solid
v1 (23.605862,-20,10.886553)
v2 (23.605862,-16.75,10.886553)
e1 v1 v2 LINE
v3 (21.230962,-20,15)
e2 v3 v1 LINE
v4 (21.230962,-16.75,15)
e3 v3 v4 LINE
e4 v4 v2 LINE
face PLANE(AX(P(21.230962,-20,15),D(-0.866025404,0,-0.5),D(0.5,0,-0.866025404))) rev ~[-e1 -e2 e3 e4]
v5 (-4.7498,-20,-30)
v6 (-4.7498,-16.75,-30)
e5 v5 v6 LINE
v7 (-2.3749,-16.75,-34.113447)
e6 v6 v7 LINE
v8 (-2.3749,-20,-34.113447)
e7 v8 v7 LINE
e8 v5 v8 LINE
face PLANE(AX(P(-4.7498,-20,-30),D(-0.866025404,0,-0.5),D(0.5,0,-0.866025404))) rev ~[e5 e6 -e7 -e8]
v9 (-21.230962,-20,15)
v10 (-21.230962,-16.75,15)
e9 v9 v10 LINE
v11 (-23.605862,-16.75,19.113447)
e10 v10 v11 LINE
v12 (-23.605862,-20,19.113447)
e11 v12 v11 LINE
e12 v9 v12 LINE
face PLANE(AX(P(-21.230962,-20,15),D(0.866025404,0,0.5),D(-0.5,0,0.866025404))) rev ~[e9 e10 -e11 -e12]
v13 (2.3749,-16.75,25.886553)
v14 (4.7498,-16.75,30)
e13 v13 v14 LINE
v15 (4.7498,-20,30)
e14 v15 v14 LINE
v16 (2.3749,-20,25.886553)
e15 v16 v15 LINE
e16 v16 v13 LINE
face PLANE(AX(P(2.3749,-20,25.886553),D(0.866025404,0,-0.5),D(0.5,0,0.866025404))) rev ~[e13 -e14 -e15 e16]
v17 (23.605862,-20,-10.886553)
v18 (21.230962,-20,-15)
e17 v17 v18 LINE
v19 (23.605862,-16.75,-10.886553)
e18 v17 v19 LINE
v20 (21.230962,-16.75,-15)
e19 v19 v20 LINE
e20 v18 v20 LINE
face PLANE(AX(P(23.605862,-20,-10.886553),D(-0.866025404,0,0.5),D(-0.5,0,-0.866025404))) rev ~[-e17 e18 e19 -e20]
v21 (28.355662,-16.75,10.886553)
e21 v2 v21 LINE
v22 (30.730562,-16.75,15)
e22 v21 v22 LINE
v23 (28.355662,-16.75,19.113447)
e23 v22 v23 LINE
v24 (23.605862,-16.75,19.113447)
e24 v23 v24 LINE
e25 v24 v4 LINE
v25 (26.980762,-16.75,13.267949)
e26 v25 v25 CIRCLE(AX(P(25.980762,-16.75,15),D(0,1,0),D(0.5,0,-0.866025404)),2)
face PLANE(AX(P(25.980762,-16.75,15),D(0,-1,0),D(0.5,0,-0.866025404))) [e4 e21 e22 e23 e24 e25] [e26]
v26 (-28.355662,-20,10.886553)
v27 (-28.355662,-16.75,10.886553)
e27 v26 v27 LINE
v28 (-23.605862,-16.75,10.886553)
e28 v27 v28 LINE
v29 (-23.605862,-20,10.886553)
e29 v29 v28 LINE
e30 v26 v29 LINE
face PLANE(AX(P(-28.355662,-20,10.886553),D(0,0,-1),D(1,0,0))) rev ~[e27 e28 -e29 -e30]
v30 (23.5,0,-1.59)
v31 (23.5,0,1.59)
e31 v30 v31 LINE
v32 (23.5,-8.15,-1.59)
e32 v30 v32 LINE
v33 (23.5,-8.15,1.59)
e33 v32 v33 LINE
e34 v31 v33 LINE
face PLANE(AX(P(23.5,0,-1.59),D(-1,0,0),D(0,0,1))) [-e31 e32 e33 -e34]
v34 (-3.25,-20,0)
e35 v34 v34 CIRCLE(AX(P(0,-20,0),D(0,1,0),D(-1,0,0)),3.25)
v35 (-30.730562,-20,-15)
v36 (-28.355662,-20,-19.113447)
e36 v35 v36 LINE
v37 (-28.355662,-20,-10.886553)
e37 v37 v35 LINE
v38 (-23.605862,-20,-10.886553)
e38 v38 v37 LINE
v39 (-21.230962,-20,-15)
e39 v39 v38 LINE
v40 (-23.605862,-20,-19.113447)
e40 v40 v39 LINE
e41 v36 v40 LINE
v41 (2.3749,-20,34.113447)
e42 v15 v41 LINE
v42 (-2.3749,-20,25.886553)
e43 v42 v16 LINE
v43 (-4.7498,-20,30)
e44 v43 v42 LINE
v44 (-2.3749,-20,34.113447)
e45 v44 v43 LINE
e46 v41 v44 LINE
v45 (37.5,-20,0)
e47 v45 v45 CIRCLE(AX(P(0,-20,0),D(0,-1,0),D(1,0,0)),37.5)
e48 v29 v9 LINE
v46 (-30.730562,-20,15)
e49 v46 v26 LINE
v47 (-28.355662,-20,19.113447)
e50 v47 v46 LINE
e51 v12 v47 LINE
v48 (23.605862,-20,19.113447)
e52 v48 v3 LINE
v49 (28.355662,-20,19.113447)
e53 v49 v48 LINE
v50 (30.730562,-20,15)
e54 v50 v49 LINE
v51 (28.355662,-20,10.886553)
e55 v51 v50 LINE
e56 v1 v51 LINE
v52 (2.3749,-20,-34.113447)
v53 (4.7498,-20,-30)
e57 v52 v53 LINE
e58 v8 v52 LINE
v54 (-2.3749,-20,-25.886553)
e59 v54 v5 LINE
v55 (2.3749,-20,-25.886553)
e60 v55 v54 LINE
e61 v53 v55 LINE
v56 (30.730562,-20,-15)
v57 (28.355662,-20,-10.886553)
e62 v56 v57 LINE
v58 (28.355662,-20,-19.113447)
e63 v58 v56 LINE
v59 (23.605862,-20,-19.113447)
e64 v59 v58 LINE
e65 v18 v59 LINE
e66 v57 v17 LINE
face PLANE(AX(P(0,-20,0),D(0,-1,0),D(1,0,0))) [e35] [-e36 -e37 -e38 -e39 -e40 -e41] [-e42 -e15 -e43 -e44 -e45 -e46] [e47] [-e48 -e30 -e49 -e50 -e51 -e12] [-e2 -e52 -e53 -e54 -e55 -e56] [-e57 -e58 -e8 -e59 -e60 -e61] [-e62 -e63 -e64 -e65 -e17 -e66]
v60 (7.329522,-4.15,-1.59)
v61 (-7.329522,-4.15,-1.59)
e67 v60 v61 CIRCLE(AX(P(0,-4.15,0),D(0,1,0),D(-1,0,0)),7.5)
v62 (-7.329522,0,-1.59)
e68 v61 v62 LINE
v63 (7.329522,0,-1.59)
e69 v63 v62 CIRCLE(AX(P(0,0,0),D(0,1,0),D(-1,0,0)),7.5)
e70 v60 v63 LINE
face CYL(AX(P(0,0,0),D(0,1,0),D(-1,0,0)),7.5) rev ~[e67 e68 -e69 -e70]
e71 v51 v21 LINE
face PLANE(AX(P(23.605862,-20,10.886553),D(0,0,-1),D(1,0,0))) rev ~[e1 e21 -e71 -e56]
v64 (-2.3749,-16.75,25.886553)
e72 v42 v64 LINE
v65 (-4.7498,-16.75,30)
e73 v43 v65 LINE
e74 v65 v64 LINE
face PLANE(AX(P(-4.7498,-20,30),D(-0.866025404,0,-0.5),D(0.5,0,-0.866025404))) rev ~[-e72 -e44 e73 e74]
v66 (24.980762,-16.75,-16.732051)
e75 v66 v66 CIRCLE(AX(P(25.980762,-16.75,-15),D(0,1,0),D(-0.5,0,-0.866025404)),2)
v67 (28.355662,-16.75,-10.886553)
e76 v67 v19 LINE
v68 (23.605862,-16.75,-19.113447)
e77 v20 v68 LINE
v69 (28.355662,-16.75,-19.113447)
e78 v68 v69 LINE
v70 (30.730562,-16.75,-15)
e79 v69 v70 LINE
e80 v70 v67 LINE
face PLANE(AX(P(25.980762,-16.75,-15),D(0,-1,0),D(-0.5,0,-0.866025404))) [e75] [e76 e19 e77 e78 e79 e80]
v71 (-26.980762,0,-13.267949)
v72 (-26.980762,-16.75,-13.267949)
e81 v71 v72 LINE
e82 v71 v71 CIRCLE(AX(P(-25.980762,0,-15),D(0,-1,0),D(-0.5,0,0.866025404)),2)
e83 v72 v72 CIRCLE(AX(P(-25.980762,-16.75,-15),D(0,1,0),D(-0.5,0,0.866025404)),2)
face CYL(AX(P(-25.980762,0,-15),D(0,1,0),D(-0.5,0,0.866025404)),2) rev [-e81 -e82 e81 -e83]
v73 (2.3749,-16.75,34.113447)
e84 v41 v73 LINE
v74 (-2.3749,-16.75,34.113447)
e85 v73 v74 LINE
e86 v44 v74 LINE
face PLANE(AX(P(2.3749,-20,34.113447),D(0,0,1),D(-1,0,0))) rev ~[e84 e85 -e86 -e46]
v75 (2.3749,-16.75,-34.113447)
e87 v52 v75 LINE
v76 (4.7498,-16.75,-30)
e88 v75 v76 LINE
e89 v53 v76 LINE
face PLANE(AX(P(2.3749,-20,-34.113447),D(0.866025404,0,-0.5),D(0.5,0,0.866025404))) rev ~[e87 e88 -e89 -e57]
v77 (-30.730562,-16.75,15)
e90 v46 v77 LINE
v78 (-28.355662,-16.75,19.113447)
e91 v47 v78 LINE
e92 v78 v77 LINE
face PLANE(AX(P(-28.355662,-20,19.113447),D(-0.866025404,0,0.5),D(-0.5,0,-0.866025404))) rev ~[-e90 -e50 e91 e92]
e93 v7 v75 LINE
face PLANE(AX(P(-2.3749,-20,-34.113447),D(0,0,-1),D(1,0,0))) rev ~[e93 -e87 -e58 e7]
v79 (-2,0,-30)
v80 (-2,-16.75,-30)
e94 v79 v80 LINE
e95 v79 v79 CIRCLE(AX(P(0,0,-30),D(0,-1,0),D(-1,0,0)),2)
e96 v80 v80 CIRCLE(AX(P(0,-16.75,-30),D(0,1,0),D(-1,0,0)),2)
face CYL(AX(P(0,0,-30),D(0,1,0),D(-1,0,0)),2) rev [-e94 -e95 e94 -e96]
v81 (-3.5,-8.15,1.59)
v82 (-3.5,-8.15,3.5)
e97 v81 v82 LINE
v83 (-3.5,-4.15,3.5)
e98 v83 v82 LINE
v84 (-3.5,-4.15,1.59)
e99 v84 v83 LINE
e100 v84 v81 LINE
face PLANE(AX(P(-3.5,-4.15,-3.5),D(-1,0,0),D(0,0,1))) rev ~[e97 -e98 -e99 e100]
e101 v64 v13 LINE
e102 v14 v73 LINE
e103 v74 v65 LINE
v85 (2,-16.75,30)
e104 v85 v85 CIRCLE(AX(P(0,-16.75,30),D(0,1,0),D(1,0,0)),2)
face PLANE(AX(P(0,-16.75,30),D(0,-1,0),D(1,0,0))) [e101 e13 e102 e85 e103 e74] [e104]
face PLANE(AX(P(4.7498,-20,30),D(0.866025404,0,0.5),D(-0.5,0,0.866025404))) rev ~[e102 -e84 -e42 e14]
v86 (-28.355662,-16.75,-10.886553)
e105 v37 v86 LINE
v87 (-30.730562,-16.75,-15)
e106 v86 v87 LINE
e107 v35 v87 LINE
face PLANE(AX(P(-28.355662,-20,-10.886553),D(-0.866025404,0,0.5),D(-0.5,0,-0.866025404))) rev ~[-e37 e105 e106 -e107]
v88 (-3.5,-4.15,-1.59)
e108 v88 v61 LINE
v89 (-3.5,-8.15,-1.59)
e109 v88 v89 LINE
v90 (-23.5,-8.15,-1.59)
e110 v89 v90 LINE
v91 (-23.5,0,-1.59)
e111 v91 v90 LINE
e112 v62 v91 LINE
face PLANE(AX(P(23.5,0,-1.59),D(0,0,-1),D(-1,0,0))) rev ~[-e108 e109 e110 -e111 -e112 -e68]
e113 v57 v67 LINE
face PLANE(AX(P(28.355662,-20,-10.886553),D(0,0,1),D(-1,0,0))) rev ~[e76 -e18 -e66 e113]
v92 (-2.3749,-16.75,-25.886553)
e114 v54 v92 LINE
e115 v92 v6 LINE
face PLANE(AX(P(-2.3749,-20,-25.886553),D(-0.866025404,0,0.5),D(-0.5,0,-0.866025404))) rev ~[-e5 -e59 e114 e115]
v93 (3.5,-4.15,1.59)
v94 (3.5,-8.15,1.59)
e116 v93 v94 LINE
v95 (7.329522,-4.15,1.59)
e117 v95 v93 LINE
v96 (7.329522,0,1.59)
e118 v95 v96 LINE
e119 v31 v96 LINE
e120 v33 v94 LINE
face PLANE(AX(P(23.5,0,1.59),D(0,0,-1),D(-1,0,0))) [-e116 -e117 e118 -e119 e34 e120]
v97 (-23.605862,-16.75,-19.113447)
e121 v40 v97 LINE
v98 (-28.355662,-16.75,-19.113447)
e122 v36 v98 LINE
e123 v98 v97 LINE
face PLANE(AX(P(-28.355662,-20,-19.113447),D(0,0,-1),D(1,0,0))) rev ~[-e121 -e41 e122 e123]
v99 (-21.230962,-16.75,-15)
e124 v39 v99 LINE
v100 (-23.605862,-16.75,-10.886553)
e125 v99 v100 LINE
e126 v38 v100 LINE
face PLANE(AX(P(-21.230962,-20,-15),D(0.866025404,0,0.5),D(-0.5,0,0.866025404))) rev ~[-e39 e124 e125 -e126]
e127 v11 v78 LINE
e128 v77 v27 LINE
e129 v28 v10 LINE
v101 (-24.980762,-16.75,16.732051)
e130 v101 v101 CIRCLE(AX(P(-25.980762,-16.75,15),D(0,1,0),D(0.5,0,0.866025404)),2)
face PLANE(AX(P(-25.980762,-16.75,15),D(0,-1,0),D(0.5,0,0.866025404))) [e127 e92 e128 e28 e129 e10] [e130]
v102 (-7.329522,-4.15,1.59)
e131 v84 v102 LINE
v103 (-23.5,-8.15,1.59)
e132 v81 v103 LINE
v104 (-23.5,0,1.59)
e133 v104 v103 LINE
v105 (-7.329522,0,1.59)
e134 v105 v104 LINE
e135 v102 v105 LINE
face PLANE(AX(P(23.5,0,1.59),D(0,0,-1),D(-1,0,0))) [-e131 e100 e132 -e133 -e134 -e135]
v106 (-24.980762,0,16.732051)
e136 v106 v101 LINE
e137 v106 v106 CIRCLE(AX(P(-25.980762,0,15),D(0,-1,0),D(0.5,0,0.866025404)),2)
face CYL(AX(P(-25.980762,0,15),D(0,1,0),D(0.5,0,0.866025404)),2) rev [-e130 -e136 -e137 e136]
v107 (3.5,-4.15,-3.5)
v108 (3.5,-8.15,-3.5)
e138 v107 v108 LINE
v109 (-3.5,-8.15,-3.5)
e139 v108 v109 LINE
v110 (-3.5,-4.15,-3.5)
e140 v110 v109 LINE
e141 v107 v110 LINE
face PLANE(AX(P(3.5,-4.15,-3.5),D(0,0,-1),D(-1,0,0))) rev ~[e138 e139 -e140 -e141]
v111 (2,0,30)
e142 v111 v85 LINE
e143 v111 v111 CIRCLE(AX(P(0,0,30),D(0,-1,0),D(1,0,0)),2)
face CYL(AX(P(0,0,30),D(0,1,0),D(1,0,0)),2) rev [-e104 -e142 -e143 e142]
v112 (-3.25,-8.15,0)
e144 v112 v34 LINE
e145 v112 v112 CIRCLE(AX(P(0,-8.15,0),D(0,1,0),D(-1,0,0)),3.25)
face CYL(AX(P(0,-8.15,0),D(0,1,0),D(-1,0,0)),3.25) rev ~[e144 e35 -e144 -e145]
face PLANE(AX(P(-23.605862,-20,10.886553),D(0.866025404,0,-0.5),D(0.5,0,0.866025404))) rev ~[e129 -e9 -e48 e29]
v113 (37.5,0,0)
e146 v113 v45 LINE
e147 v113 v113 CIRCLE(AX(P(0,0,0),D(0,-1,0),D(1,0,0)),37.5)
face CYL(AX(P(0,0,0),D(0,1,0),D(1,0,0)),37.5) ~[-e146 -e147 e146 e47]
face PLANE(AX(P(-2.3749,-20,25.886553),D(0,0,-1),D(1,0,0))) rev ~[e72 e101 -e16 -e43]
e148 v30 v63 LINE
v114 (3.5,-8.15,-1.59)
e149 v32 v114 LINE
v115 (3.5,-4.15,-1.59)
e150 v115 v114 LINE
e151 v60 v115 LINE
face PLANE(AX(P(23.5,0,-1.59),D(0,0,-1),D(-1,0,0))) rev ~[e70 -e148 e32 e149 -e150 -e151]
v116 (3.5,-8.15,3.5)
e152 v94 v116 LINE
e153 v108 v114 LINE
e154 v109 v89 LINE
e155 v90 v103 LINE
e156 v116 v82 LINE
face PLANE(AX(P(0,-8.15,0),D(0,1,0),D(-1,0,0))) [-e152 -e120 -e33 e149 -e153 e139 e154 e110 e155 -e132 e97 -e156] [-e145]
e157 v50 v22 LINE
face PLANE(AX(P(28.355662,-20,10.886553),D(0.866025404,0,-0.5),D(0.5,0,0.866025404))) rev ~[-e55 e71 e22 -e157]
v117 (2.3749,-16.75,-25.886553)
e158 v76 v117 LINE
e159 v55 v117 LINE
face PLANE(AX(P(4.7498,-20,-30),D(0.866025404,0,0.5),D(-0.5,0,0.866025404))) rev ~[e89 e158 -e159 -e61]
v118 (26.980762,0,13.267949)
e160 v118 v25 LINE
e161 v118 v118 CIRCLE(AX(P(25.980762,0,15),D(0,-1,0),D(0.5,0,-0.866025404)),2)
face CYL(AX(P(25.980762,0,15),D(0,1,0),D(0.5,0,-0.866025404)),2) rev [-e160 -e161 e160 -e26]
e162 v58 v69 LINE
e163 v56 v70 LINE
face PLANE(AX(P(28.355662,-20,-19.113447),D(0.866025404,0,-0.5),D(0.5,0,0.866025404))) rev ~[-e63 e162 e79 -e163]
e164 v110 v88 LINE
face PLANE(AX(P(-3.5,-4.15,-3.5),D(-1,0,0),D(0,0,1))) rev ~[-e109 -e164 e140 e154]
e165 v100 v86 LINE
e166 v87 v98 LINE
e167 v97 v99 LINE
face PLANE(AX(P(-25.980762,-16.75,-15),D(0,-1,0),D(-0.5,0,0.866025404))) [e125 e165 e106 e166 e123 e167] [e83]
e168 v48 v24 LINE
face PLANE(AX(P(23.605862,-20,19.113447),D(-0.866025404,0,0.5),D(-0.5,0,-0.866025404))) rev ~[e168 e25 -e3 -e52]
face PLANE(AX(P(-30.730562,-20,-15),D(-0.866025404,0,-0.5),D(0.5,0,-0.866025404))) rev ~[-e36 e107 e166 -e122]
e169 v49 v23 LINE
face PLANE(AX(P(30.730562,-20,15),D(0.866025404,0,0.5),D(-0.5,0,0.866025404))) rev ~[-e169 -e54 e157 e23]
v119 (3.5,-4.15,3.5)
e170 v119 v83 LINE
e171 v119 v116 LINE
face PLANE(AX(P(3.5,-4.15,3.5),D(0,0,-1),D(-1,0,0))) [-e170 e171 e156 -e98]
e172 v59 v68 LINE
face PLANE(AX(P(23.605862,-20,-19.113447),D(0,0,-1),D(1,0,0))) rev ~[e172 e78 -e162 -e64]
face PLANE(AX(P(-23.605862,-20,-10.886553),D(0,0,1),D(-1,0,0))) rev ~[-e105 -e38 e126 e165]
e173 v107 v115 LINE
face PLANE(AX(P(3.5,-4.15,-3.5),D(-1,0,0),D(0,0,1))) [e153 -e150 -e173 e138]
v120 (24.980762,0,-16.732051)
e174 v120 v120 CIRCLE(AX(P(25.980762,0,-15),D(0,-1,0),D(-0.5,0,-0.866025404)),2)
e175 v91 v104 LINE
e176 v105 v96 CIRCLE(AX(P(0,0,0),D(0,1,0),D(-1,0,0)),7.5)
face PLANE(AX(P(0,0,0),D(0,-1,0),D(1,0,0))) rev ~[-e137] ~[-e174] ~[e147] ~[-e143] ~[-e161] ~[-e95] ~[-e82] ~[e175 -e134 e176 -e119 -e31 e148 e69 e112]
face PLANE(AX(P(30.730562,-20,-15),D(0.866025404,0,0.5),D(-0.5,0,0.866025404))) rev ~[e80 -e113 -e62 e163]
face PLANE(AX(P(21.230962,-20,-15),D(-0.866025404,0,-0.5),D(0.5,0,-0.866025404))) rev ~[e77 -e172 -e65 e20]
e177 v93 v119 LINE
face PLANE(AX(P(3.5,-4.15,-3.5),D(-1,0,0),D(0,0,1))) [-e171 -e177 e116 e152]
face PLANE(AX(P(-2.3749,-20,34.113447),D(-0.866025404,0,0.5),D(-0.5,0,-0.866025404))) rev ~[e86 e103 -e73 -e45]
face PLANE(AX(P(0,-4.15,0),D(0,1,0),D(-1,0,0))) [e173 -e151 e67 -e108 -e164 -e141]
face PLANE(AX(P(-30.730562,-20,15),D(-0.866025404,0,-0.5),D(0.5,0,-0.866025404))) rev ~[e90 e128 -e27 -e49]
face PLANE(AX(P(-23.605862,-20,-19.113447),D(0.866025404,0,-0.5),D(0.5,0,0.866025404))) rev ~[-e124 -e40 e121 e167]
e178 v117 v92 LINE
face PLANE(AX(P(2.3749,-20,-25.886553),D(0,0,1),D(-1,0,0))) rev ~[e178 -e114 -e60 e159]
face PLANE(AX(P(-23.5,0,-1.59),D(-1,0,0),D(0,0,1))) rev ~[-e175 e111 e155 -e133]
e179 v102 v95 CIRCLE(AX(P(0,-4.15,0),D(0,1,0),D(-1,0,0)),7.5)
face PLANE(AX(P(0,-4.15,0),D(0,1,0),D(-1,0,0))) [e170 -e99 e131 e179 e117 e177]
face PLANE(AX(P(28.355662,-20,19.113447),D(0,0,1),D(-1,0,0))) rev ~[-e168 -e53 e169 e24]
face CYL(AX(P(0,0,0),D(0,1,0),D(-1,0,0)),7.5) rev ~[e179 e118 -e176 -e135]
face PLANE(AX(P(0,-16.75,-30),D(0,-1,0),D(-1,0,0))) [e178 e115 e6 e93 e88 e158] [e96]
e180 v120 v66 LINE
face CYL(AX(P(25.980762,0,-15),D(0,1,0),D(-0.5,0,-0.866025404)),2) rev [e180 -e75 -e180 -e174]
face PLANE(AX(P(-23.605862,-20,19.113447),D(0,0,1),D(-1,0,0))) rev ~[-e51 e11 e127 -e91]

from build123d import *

# Parameters (mm, degrees)
F0_R            = 37.5
F1_DEPTH        = 20
F2_R            = 2
F3_DEPTH        = 20.001
F3_COPIES_COUNT = 6
F5_DEPTH        = 3.25
F5_COPIES_COUNT = 6
F6_R            = 7.5
F7_DEPTH        = 4.15
F8_W            = 7
F8_H            = 7
F9_DEPTH        = 4
F10_W           = 47
F10_H           = 3.18
F11_DEPTH       = 8.15
F12_R           = 3.25
F13_DEPTH       = 11.851


# Not quite as in the source:
# - a pattern or mirror of a feature is missing from the dataset's text; its kind, count and spacing are read off the source's solid


with BuildPart() as f1:
    # F0 (on Front) → F1 (new body)
    with BuildSketch(Plane.XZ):
        Circle(F0_R)
    extrude(amount=F1_DEPTH)

    # F2 (on Front) → F3 (cut, through all)
    with BuildSketch(Plane.XZ):
        with Locations((0, 30)):
            Circle(F2_R)
    f3 = extrude(amount=F3_DEPTH, mode=Mode.SUBTRACT)

    # F3_copies: F3 ×6 about axis
    f3_copies_axis = Axis((0, 0, 0), (0, 1, 0))
    for i in range(1, F3_COPIES_COUNT):
        add(f3.rotate(f3_copies_axis, i * 360 / F3_COPIES_COUNT), mode=Mode.SUBTRACT)

    # F4 (on face) → F5 (cut)
    with BuildSketch(Plane.XZ.offset(20)):
        Polygon((2.3749, 34.1134474629), (-2.3749, 34.1134474629), (-4.7498, 30), (-2.3749, 25.8865525371), (2.3749, 25.8865525371), (4.7498, 30), align=None)
    f5 = extrude(amount=-F5_DEPTH, mode=Mode.SUBTRACT)

    # F5_copies: F5 ×6 about axis
    f5_copies_axis = Axis((0, 0, 0), (0, 1, 0))
    for i in range(1, F5_COPIES_COUNT):
        add(f5.rotate(f5_copies_axis, i * 360 / F5_COPIES_COUNT), mode=Mode.SUBTRACT)

    # F6 (on face) → F7 (cut)
    with BuildSketch(Plane(origin=(0, 0, 0), x_dir=(-1, 0, 0), z_dir=(0, 1, 0))):
        Circle(F6_R)
    extrude(amount=-F7_DEPTH, mode=Mode.SUBTRACT)

    # F8 (on face) → F9 (cut)
    with BuildSketch(Plane(origin=(0, -4.15, 0), x_dir=(-1, 0, 0), z_dir=(0, 1, 0))):
        Rectangle(F8_W, F8_H)
    extrude(amount=-F9_DEPTH, mode=Mode.SUBTRACT)

    # F10 (on face) → F11 (cut, through all)
    with BuildSketch(Plane(origin=(0, 0, 0), x_dir=(-1, 0, 0), z_dir=(0, 1, 0))):
        Rectangle(F10_W, F10_H)
    extrude(amount=-F11_DEPTH, mode=Mode.SUBTRACT)

    # F12 (on face) → F13 (cut, through all)
    with BuildSketch(Plane(origin=(0, -8.15, 0), x_dir=(-1, 0, 0), z_dir=(0, 1, 0))):
        Circle(F12_R)
    extrude(amount=-F13_DEPTH, mode=Mode.SUBTRACT)


solid = f1.part
